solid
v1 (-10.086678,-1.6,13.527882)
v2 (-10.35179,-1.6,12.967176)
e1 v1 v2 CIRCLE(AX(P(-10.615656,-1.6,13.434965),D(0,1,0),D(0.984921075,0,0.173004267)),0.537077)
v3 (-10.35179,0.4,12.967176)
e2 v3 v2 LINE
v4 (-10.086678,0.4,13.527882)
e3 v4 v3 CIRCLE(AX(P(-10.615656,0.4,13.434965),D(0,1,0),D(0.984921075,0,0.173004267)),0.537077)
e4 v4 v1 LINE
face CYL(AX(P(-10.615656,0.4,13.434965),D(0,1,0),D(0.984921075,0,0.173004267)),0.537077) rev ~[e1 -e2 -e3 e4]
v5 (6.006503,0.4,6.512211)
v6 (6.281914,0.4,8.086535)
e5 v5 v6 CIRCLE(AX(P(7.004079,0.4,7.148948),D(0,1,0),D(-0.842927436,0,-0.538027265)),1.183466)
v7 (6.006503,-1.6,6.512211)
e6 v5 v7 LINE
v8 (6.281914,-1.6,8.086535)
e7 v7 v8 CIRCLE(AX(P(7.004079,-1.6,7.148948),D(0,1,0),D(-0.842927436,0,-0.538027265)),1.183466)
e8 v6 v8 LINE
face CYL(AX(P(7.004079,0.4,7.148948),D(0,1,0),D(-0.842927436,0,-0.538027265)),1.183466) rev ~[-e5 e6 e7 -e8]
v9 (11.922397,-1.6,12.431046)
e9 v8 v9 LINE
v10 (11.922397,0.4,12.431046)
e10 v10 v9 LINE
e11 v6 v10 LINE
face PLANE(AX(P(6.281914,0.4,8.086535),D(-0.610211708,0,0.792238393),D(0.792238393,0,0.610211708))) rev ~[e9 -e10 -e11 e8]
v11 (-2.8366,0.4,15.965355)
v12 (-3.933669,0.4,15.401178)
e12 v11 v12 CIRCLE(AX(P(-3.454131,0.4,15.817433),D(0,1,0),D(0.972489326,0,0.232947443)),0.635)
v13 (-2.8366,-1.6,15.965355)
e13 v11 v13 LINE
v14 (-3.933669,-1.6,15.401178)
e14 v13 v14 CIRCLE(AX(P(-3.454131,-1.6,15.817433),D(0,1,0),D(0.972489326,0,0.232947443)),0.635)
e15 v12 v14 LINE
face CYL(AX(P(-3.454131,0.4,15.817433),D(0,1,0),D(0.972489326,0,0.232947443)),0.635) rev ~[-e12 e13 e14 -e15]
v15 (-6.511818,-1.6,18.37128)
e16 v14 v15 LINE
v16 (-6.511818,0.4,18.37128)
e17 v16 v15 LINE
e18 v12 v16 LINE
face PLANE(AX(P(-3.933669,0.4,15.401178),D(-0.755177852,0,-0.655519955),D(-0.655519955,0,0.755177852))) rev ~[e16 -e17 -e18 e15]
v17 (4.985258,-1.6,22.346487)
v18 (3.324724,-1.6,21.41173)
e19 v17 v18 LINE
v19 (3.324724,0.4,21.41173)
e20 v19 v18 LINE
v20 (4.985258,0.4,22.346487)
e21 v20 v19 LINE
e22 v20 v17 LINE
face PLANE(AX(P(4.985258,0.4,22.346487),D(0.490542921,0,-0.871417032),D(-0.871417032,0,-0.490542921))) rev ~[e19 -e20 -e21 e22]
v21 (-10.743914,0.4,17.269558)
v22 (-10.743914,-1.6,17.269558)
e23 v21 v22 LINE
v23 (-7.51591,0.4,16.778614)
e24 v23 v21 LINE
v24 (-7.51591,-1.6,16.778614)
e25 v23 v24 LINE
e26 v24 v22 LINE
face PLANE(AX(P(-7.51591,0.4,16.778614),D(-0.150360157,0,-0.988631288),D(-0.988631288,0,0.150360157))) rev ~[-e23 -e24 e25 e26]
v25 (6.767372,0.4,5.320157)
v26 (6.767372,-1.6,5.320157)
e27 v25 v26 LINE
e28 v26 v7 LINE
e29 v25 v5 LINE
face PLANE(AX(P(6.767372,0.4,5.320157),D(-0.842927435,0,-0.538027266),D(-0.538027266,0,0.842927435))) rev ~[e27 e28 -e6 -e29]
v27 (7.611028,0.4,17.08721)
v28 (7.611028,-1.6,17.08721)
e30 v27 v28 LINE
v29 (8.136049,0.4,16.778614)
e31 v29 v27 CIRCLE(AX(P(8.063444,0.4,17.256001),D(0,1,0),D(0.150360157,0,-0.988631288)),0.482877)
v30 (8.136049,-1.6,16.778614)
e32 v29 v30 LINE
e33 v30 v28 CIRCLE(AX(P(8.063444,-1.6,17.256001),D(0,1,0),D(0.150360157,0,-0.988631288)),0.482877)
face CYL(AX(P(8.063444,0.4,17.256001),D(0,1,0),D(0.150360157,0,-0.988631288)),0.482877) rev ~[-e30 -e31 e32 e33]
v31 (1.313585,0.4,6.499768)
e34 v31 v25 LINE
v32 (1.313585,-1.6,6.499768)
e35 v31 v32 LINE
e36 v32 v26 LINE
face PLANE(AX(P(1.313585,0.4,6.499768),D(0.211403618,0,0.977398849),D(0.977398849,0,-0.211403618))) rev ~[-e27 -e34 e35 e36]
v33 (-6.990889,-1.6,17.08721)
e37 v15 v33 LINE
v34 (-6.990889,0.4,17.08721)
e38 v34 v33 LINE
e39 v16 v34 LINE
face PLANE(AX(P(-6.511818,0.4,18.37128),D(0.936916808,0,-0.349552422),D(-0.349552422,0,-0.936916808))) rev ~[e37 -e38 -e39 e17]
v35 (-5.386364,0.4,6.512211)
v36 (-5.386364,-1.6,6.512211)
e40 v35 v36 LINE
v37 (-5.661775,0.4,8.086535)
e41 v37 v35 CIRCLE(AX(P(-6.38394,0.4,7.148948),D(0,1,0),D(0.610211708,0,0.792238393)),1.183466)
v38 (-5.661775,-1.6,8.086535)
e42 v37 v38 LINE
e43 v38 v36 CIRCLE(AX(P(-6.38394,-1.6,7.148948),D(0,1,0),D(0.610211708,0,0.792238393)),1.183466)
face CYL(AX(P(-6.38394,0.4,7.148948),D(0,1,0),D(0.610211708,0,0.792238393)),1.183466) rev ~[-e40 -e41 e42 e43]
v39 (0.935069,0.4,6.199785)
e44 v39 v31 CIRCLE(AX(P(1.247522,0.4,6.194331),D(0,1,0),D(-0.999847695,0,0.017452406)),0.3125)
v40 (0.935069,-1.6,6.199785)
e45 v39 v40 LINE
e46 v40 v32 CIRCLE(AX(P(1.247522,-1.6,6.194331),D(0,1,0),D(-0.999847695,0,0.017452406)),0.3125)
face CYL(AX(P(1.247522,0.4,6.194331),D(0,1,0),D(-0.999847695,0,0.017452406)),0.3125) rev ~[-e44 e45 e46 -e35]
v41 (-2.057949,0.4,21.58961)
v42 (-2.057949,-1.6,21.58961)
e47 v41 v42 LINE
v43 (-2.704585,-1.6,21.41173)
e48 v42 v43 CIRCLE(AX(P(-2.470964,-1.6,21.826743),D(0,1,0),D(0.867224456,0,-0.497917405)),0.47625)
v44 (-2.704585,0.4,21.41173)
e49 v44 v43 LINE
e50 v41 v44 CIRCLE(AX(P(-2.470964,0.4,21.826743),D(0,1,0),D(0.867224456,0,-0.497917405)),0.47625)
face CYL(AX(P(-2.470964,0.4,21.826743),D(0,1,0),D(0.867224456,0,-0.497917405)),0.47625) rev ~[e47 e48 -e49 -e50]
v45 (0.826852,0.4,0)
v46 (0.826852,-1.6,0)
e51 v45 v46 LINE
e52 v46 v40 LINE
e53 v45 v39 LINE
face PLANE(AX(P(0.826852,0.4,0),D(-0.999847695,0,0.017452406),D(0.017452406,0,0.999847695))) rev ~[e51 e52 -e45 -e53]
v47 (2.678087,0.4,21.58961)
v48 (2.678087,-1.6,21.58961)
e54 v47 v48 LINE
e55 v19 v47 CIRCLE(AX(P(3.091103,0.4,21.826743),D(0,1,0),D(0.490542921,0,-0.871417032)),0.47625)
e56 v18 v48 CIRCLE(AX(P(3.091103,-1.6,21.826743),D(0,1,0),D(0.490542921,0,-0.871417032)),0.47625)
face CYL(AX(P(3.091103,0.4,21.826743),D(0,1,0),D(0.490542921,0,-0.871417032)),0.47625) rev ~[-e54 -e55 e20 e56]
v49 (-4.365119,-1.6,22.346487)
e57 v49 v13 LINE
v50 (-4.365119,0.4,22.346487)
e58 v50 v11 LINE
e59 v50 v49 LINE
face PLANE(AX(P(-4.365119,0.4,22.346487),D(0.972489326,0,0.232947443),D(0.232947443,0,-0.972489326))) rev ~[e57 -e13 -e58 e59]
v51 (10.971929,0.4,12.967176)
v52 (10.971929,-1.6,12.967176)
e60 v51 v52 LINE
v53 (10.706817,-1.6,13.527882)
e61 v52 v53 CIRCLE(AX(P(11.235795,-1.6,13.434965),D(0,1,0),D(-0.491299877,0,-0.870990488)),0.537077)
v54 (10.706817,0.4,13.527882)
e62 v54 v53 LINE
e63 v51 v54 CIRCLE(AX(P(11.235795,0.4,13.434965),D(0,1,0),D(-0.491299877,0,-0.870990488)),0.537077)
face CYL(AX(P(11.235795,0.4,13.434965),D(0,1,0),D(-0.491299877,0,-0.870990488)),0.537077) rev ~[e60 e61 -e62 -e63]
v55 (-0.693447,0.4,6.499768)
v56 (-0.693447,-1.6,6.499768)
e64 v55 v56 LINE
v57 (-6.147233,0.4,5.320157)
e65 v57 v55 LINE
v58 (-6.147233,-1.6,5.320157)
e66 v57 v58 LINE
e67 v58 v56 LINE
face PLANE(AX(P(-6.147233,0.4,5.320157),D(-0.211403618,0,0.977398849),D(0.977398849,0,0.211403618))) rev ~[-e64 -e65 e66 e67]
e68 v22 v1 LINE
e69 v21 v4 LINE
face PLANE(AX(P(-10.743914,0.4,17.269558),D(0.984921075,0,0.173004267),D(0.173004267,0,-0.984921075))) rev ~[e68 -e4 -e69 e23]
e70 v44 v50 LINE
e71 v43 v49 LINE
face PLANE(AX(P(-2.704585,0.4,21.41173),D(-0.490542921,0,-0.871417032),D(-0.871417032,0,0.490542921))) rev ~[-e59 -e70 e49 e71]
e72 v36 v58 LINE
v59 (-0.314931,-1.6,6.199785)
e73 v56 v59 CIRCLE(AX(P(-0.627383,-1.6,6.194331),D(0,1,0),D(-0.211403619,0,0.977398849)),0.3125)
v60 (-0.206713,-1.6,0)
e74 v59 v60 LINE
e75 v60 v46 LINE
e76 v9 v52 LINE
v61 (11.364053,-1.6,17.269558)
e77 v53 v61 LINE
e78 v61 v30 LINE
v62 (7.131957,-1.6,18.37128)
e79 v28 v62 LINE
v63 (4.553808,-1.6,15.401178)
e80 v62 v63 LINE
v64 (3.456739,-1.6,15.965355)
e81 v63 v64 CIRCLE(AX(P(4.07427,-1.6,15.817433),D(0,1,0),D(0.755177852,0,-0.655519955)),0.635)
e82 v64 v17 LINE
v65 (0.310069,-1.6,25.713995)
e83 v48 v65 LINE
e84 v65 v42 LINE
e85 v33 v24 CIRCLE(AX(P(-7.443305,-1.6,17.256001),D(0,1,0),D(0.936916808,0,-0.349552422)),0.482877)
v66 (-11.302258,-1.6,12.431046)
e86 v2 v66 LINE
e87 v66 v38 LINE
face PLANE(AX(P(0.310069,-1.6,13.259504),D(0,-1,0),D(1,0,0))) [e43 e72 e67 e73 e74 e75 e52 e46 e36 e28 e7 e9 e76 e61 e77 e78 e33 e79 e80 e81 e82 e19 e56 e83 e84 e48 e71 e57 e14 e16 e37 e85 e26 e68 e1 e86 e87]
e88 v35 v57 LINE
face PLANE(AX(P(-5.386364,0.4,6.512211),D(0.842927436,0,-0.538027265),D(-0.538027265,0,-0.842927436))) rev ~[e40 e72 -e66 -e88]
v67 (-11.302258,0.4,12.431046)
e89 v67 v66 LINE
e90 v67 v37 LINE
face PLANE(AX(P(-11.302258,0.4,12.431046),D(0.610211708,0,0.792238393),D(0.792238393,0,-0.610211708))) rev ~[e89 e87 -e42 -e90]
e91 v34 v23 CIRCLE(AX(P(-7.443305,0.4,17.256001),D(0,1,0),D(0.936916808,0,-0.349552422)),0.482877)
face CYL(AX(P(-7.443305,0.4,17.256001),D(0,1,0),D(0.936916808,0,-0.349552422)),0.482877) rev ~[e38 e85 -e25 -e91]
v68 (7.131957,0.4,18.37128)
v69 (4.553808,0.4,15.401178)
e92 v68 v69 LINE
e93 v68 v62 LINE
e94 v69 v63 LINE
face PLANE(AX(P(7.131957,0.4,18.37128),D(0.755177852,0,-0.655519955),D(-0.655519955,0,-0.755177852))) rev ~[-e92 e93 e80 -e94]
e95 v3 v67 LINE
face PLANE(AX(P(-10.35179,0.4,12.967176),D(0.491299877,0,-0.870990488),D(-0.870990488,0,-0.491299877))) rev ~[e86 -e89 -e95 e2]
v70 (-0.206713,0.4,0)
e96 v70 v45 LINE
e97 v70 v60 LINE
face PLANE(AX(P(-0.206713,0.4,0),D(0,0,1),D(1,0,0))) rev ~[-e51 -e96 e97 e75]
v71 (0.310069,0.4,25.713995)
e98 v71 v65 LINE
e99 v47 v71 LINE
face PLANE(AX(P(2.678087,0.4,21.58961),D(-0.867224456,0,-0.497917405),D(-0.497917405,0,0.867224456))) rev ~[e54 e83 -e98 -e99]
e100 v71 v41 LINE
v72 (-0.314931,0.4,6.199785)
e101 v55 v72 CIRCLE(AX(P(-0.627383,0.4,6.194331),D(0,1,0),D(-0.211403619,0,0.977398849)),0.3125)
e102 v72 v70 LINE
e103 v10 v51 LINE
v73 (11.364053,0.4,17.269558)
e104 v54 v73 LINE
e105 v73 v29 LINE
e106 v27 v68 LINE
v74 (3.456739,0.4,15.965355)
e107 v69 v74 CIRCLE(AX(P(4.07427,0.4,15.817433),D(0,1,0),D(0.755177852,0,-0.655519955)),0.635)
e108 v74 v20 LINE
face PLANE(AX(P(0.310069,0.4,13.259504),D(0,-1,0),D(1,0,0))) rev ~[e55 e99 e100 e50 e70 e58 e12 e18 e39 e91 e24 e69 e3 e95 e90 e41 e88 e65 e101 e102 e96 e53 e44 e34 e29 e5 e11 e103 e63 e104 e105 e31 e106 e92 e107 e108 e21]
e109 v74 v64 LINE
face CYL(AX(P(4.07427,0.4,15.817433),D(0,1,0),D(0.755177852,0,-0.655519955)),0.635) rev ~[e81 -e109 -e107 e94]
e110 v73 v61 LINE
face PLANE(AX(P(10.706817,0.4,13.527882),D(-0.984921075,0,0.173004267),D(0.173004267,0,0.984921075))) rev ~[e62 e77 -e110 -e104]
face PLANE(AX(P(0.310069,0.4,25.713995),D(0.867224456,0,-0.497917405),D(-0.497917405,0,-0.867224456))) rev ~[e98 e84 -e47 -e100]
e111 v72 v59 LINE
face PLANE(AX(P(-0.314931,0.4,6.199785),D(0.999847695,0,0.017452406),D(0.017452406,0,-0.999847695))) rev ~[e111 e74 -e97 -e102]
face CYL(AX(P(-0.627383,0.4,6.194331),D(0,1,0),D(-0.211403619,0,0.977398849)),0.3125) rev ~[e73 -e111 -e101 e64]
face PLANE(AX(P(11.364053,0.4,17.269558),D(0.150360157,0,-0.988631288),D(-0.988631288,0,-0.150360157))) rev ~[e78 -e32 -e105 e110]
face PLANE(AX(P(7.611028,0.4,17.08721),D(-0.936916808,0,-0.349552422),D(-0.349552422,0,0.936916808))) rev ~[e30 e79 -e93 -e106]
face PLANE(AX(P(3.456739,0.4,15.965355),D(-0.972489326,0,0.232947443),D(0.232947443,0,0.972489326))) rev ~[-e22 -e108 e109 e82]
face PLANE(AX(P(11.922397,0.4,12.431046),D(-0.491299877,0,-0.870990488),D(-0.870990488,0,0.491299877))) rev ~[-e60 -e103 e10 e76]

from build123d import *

# Parameters (mm, degrees)
F1_DEPTH = 1.6
F2_SCALE = 1.25


with BuildPart() as f1:
    # F0 (on Front) → F1 (new body)
    with BuildSketch(Plane.XZ):
        with BuildLine():
            Line((0, 0), (0.413425887, 0))
            Line((0.413425887, 0), (0.8268517741, 0))
            Line((0.8268517741, 0), (0.913425887, 4.9598276104))
            ThreePointArc((0.913425887, 4.9598276104), (1.0081087659, 5.1513941345), (1.2162387154, 5.1998142211))
            Line((1.2162387154, 5.1998142211), (5.5792679741, 4.2561256))
            Line((5.5792679741, 4.2561256), (4.9705727128, 5.2097686))
            ThreePointArc((4.9705727128, 5.2097686), (4.8360238518, 5.8823080691), (5.1909015741, 6.4692276))
            Line((5.1909015741, 6.4692276), (9.7032877741, 9.9448366))
            Line((9.7032877741, 9.9448366), (8.9429137741, 10.373741))
            ThreePointArc((8.9429137741, 10.373741), (8.7655752428, 10.5643141825), (8.7308237651, 10.8223053206))
            Line((8.7308237651, 10.8223053206), (9.2566129031, 13.8156465299))
            Line((9.2566129031, 13.8156465299), (6.6742096902, 13.4228908506))
            ThreePointArc((6.6742096902, 13.4228908506), (6.4203753707, 13.4717678019), (6.2541926873, 13.66976814))
            Line((6.2541926873, 13.66976814), (5.8709357741, 14.6970242))
            Line((5.8709357741, 14.6970242), (3.8084164021, 12.3209425283))
            ThreePointArc((3.8084164021, 12.3209425283), (3.1924630132, 12.2021834474), (2.9307614756, 12.7722839665))
            Line((2.9307614756, 12.7722839665), (4.1535767314, 17.8771898961))
            Line((4.1535767314, 17.8771898961), (2.8251496269, 17.1293843238))
            ThreePointArc((2.8251496269, 17.1293843238), (2.5371995805, 17.0940398171), (2.3078402562, 17.2716876815))
            Line((2.3078402562, 17.2716876815), (0.413425887, 20.5711957021))
            Line((0.413425887, 20.5711957021), (-1.4809884821, 17.2716876815))
            ThreePointArc((-1.4809884821, 17.2716876815), (-1.7103478064, 17.0940398171), (-1.9982978528, 17.1293843238))
            Line((-1.9982978528, 17.1293843238), (-3.3267249573, 17.8771898961))
            Line((-3.3267249573, 17.8771898961), (-2.1039097015, 12.7722839665))
            ThreePointArc((-2.1039097015, 12.7722839665), (-2.3656112391, 12.2021834474), (-2.9815646281, 12.3209425283))
            Line((-2.9815646281, 12.3209425283), (-5.044084, 14.6970242))
            Line((-5.044084, 14.6970242), (-5.4273409133, 13.66976814))
            ThreePointArc((-5.4273409133, 13.66976814), (-5.5935235967, 13.4717678019), (-5.8473579162, 13.4228908506))
            Line((-5.8473579162, 13.4228908506), (-8.4297611291, 13.8156465299))
            Line((-8.4297611291, 13.8156465299), (-7.903971991, 10.8223053206))
            ThreePointArc((-7.903971991, 10.8223053206), (-7.9387234687, 10.5643141825), (-8.116062, 10.373741))
            Line((-8.116062, 10.373741), (-8.876436, 9.9448366))
            Line((-8.876436, 9.9448366), (-4.3640498, 6.4692276))
            ThreePointArc((-4.3640498, 6.4692276), (-4.0091720777, 5.8823080691), (-4.1437209388, 5.2097686))
            Line((-4.1437209388, 5.2097686), (-4.7524162, 4.2561256))
            Line((-4.7524162, 4.2561256), (-0.3893869413, 5.1998142211))
            ThreePointArc((-0.3893869413, 5.1998142211), (-0.1812569918, 5.1513941345), (-0.086574113, 4.9598276104))
            Line((-0.086574113, 4.9598276104), (0, 0))
        make_face()
    extrude(amount=F1_DEPTH)


with BuildPart() as f1_1:
    # F2: moved
    add(f1.part.scale(F2_SCALE).moved(Location((-0.2067129435, 0.4, 0))))


solid = f1_1.part
